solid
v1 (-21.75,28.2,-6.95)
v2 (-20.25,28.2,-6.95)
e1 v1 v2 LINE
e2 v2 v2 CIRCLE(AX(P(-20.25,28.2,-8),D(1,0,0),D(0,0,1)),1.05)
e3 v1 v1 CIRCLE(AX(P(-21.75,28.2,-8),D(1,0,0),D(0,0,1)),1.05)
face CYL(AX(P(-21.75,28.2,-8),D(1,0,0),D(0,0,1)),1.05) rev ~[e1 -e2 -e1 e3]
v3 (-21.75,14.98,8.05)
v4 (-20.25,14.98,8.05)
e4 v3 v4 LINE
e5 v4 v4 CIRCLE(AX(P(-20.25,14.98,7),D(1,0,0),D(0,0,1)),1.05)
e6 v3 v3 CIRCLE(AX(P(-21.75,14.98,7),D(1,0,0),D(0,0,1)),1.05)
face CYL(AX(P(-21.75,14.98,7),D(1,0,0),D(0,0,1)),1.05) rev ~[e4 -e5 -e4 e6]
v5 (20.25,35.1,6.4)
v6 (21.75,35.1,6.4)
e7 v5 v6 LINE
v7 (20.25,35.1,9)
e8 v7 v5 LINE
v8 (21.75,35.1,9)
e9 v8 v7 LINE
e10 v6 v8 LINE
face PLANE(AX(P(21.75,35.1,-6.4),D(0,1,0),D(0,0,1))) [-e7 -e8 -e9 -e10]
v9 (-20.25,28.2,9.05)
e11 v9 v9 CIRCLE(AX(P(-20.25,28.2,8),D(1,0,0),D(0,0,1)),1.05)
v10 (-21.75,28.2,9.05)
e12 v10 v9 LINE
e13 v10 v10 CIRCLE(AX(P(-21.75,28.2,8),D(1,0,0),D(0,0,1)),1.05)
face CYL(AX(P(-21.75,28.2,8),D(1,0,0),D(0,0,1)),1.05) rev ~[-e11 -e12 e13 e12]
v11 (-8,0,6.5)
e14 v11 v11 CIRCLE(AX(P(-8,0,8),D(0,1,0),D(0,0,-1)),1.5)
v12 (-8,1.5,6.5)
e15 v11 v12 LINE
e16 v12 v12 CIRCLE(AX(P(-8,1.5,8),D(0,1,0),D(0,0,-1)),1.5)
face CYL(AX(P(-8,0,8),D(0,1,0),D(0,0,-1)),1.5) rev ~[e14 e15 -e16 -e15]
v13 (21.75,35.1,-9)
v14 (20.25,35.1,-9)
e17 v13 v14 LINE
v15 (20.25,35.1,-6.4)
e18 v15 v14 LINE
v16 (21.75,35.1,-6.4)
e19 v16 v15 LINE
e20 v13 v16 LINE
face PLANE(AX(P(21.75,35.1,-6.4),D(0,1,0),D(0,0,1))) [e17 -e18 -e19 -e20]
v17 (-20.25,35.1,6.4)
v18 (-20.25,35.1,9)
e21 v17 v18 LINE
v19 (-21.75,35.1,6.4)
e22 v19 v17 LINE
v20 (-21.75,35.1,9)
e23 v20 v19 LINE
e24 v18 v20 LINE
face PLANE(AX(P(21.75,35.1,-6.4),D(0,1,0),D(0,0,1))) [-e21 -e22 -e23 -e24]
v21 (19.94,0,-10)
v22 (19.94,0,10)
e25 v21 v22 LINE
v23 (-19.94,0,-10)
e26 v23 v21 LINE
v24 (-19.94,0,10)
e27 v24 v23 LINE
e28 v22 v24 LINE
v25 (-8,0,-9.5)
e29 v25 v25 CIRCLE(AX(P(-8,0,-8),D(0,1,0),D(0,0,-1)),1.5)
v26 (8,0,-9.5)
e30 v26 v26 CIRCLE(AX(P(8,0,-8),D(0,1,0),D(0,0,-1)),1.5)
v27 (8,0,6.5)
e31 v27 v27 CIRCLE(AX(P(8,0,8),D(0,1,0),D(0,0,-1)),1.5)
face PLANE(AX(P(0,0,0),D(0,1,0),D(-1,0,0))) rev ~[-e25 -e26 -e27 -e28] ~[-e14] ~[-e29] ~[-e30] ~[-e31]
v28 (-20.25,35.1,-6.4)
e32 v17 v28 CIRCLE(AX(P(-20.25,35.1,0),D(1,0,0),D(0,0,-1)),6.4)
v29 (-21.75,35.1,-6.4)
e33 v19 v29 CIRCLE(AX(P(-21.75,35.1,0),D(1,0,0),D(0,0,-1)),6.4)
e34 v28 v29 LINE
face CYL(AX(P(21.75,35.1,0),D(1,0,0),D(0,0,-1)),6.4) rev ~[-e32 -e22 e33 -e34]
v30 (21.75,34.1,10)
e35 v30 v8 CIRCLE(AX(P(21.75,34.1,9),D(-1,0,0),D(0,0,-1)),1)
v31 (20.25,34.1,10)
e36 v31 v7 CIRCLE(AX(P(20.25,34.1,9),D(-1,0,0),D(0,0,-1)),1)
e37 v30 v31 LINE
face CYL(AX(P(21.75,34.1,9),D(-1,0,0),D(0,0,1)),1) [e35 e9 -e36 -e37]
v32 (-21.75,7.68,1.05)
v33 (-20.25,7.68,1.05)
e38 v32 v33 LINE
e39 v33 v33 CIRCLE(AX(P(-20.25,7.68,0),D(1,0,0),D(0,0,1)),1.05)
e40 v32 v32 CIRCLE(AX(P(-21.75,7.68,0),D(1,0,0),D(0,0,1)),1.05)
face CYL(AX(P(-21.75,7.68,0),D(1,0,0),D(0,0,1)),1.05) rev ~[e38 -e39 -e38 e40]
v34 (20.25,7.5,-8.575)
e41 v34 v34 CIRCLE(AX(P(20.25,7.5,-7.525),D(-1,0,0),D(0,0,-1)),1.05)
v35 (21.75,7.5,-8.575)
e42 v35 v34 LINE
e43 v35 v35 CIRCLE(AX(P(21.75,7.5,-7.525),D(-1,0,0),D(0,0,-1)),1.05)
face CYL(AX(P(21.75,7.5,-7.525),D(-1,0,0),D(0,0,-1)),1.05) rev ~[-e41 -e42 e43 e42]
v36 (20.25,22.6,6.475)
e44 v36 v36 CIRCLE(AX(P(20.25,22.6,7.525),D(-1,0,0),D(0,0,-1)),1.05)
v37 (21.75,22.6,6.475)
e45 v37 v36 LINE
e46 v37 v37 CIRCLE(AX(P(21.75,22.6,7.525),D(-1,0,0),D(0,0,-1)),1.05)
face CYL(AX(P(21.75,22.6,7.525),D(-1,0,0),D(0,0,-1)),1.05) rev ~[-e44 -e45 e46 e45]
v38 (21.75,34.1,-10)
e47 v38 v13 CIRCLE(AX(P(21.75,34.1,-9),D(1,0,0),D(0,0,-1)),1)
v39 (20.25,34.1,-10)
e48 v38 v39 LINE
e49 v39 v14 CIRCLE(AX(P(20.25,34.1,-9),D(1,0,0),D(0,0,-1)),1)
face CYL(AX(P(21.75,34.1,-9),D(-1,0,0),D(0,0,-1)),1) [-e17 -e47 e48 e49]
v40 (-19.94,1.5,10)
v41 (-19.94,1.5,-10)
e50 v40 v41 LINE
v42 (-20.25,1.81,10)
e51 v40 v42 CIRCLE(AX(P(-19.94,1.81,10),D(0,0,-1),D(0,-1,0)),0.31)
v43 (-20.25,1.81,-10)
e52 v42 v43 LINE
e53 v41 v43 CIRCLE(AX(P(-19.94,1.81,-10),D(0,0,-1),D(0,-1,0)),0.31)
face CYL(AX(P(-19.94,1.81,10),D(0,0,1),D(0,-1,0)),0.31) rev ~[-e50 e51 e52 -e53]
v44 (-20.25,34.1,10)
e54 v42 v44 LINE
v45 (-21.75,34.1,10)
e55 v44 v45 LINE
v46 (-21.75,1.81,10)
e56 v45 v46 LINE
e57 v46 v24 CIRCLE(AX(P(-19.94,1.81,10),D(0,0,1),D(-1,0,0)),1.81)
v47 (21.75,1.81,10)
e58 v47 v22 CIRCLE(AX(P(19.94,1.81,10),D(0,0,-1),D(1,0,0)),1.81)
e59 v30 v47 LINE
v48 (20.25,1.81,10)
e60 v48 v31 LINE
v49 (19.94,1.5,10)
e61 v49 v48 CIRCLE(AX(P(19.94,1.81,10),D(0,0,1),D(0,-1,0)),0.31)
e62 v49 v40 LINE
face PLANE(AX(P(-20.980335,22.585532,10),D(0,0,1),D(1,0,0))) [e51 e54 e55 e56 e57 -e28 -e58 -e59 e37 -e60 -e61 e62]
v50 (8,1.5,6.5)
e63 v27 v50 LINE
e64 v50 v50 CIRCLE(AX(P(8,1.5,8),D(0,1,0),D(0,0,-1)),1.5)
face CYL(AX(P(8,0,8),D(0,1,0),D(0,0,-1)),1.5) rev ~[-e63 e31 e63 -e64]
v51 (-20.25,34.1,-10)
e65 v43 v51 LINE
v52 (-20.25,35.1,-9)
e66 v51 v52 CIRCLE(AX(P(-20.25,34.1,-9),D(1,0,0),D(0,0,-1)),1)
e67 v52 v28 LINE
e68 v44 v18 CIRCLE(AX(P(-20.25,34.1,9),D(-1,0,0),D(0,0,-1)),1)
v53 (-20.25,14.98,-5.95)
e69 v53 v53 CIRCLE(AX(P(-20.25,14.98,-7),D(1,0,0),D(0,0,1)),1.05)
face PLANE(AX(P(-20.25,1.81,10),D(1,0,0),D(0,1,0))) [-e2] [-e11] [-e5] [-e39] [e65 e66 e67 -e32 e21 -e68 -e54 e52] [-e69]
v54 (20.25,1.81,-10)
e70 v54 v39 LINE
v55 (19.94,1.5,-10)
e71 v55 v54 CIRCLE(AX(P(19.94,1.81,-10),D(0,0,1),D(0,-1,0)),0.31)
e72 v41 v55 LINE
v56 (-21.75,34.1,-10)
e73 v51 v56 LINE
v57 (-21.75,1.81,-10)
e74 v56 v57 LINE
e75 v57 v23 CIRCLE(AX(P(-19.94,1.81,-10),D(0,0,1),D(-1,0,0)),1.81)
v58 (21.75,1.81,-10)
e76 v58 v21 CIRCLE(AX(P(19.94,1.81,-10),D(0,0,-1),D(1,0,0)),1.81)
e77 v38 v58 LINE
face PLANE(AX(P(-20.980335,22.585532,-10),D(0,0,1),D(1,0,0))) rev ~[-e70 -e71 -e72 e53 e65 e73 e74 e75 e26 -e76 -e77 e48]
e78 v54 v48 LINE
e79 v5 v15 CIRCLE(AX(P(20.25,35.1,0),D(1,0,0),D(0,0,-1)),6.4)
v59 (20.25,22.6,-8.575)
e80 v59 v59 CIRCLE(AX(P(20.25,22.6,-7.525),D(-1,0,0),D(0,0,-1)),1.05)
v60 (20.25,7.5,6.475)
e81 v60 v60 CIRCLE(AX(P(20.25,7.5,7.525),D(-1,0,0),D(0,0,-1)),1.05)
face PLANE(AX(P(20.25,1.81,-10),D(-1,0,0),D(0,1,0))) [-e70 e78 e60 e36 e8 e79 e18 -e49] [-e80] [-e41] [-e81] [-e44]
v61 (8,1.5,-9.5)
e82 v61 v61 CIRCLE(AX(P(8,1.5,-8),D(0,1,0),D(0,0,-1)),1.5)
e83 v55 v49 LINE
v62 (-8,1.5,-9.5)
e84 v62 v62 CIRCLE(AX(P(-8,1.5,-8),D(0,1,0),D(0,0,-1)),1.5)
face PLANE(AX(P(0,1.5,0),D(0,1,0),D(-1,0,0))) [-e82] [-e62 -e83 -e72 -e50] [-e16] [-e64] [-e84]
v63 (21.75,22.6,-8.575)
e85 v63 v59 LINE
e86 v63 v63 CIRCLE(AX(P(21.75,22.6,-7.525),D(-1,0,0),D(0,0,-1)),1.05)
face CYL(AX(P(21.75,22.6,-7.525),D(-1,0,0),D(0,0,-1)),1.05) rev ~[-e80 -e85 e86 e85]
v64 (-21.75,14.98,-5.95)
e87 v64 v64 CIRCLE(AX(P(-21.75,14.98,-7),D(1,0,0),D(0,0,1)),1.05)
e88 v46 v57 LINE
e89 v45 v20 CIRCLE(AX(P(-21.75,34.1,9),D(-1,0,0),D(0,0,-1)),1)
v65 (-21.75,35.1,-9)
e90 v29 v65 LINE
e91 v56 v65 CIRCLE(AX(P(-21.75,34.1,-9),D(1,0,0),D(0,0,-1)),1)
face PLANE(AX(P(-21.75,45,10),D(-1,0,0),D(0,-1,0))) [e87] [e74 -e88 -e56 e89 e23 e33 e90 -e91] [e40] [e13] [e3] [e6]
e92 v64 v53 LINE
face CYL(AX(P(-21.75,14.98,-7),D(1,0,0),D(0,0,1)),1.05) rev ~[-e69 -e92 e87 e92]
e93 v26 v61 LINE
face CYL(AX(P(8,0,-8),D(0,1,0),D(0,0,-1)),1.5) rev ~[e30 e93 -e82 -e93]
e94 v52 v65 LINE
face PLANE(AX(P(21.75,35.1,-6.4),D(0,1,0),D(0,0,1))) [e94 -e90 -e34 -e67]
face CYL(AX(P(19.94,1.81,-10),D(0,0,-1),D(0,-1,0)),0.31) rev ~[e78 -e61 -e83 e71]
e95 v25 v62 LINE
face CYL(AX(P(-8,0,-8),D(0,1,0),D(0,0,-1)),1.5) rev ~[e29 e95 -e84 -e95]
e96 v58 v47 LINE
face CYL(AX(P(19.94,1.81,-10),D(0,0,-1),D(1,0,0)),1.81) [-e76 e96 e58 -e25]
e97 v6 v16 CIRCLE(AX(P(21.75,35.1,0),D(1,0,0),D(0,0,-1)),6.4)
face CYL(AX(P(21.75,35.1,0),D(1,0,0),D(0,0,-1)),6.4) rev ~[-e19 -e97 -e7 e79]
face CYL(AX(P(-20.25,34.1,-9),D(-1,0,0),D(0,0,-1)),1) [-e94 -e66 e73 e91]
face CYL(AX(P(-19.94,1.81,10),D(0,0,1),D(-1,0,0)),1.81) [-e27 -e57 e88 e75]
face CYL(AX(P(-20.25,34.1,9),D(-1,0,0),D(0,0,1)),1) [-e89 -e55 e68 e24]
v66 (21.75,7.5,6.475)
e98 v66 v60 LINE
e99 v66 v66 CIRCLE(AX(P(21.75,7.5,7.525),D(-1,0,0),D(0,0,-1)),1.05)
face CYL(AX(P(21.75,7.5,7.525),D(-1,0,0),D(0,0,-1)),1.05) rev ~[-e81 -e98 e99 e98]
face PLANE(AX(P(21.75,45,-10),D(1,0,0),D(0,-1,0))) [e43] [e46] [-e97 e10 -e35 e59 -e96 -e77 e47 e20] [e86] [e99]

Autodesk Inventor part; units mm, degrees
ref_plane "YZ Plane" through (0, 0, 0) normal (1, 0, 0) x (0, 1, 0)
ref_plane "XZ Plane" through (0, 0, 0) normal (0, 1, 0) x (-1, 0, 0)
ref_plane "XY Plane" through (0, 0, 0) normal (0, 0, 1) x (1, 0, 0)
sketch "Sketch1" plane through (0, 0, 0) normal (0, 1, 0) x (-1, 0, 0)
  line L0 (20.25, -10) -> (-20.25, -10)
  line L1 (-20.25, -10) -> (-20.25, 10)
  line L2 (-20.25, 10) -> (20.25, 10)
  line L3 (20.25, 10) -> (20.25, -10)
  point P0 (0, 0)
  dimension "d0" = 40.5
  dimension "d1" = 20
  dimension "d2" = 10
  dimension "d3" = 20.25
extrude "Plate1" add sketch "Sketch1" along normal blind 1.5
sketch "Sketch2" plane through (21.75, 0, -10) normal (-1, 0, 0) x (0, -1, 0)
  line L0 (0, 20) -> (0, 0)
  line L1 (0, 0) -> (-45, 0)
  line L2 (-45, 0) -> (-45, 20)
  line L3 (-45, 20) -> (0, 20)
edge flange "Flange1" height 45 angle 90 thickness 1.5 bend radius 0.31 thickness toward (-1, 0, 0) relief tear relief width 1.5 relief depth 0.75 edges at (20.25, 1.5, 0) wall of the first edge with corners at (21.75, 0, 10) (21.75, 0, -10) (21.75, 45, -10) (21.75, 45, 10)
bend "Bend1"
corner "Corner1"
sketch "Sketch3" plane through (-21.75, 0, 10) normal (1, 0, 0) x (0, 1, 0)
  line L0 (0, -20) -> (0, 0)
  line L1 (0, 0) -> (45, 0)
  line L2 (45, 0) -> (45, -20)
  line L3 (45, -20) -> (0, -20)
edge flange "Flange2" height 45 angle 90 thickness 1.5 bend radius 0.31 thickness toward (1, 0, 0) relief tear relief width 1.5 relief depth 0.75 edges at (-20.25, 1.5, 0) wall of the first edge with corners at (-21.75, 0, -10) (-21.75, 0, 10) (-21.75, 45, 10) (-21.75, 45, -10)
bend "Bend2"
corner "Corner2"
sketch "Sketch4" plane through (21.75, 45, 10) normal (1, 0, 0) x (0, 0, -1)
  circle A0 centre (10, -9.9) radius 6.4
  line L0 (0, 0) -> (20, 0) projected
  line L1 (20, 0) -> (20, -43.19) projected
  point P0 (10, -45)
  dimension "d25" = 9.9
  dimension "d26" = 12.8
  dimension "d27" = 10
extrude "Extrusion1" cut sketch "Sketch4" against normal blind 50
sketch "Sketch5" plane through (21.75, 45, 10) normal (1, 0, 0) x (0, 0, -1)
  circle A0 centre (10, -9.9) radius 6.4 projected
  line L0 (0, 0) -> (20, 0) projected
  line L1 (-4, 0) -> (24, 0)
  line L2 (24, 0) -> (24, -9.9)
  line L3 (24, -9.9) -> (-4, -9.9)
  line L4 (-4, -9.9) -> (-4, 0)
  line L5 (0, -43.19) -> (0, 0) projected
  point P0 (10, -45)
  dimension "d30" = 9.9
  dimension "d31" = 28
  dimension "d32" = 4
extrude "Extrusion2" cut sketch "Sketch5" against normal blind 50 contours L3 A0 | A0 L3 L5 L0 L1 L2 | L3 L4 L1 L5 picked at (9.2435, -7.9053)
fillet "Fillet1" radius 1 4 edges at (-21, 35.1, 10) (-21, 35.1, -10) (21, 35.1, -10) (21, 35.1, 10)
sketch "Sketch8" plane through (0, 0, 0) normal (0, -1, 0) x (1, 0, 0)
  circle A0 centre (8, -8) radius 1.05 projected
  circle A1 centre (-8, -8) radius 1.05 projected
  circle A2 centre (8, 8) radius 1.05 projected
  circle A3 centre (-8, 8) radius 1.05 projected
  point P0 (0, 0)
hole "Hole3" at (8, 0, -8) at (-8, 0, -8) at (-8, 0, 8) at (8, 0, 8) direction (0, 1, 0) diameter 3 depth 1.5
sketch "Sketch9" plane through (21.75, 1.81, 10) normal (1, 0, 0) x (0, 0, -1)
  circle A0 centre (2.475, 5.69) radius 0.7835 projected
  circle A1 centre (2.475, 20.79) radius 0.7835 projected
  circle A2 centre (17.525, 20.79) radius 0.7835 projected
  circle A3 centre (17.525, 5.69) radius 0.7835 projected
  point P0 (10, -1.81)
hole "Hole4" at (21.75, 7.5, -7.525) at (21.75, 22.6, -7.525) at (21.75, 22.6, 7.525) at (21.75, 7.5, 7.525) direction (-1, 0, 0) diameter 2.1 depth 1.5
sketch "Sketch10" plane through (-21.75, 1.81, -10) normal (-1, 0, 0) x (0, 0, 1)
  circle A0 centre (18, 26.39) radius 0.7835 projected
  circle A1 centre (2, 26.39) radius 0.7835 projected
  circle A2 centre (3, 13.17) radius 0.7835 projected
  circle A3 centre (17, 13.17) radius 0.7835 projected
  circle A4 centre (10, 5.87) radius 0.7835 projected
  point P0 (10, -1.81)
hole "Hole5" at (-21.75, 7.68, 0) at (-21.75, 14.98, -7) at (-21.75, 28.2, -8) at (-21.75, 28.2, 8) at (-21.75, 14.98, 7) direction (1, 0, 0) diameter 2.1 depth 1.5
equation "\"d55\" = Thickness"
equation "\"d62\" = Thickness"
equation "\"d69\" = Thickness"
equation "\"d4\" = Thickness"
equation "\"d5\" = BendReliefWidth"
equation "\"d6\" = BendReliefDepth"
equation "\"d7\" = MinimumRemnant"
equation "\"d8\" = TransitionRadius"
equation "\"d11\" = BendRadius"
equation "\"d12\" = CornerReliefSize"
equation "\"d13\" = GapSize"
equation "\"d14\" = JacobiRadiusSize"
equation "\"d15\" = BendReliefWidth"
equation "\"d16\" = BendReliefDepth"
equation "\"d17\" = MinimumRemnant"
equation "\"d18\" = TransitionRadius"
equation "\"d21\" = BendRadius"
equation "\"d22\" = CornerReliefSize"
equation "\"d23\" = GapSize"
equation "\"d24\" = JacobiRadiusSize"
equation "\"BendReliefWidth\" = Thickness"
equation "\"BendReliefDepth\" = 0.5 * Thickness"
equation "\"CornerReliefSize\" = 4 * Thickness"
equation "\"MinimumRemnant\" = 2 * Thickness"
equation "\"TransitionRadius\" = BendRadius"
equation "\"JacobiRadiusSize\" = BendRadius"
equation "\"GapSize\" = Thickness"
equation "\"Thickness\" = 1.5"
equation "\"BendRadius\" = 0.31"
properties part number "axis_10_top_frame" material "Aluminum 6061-AHC"
